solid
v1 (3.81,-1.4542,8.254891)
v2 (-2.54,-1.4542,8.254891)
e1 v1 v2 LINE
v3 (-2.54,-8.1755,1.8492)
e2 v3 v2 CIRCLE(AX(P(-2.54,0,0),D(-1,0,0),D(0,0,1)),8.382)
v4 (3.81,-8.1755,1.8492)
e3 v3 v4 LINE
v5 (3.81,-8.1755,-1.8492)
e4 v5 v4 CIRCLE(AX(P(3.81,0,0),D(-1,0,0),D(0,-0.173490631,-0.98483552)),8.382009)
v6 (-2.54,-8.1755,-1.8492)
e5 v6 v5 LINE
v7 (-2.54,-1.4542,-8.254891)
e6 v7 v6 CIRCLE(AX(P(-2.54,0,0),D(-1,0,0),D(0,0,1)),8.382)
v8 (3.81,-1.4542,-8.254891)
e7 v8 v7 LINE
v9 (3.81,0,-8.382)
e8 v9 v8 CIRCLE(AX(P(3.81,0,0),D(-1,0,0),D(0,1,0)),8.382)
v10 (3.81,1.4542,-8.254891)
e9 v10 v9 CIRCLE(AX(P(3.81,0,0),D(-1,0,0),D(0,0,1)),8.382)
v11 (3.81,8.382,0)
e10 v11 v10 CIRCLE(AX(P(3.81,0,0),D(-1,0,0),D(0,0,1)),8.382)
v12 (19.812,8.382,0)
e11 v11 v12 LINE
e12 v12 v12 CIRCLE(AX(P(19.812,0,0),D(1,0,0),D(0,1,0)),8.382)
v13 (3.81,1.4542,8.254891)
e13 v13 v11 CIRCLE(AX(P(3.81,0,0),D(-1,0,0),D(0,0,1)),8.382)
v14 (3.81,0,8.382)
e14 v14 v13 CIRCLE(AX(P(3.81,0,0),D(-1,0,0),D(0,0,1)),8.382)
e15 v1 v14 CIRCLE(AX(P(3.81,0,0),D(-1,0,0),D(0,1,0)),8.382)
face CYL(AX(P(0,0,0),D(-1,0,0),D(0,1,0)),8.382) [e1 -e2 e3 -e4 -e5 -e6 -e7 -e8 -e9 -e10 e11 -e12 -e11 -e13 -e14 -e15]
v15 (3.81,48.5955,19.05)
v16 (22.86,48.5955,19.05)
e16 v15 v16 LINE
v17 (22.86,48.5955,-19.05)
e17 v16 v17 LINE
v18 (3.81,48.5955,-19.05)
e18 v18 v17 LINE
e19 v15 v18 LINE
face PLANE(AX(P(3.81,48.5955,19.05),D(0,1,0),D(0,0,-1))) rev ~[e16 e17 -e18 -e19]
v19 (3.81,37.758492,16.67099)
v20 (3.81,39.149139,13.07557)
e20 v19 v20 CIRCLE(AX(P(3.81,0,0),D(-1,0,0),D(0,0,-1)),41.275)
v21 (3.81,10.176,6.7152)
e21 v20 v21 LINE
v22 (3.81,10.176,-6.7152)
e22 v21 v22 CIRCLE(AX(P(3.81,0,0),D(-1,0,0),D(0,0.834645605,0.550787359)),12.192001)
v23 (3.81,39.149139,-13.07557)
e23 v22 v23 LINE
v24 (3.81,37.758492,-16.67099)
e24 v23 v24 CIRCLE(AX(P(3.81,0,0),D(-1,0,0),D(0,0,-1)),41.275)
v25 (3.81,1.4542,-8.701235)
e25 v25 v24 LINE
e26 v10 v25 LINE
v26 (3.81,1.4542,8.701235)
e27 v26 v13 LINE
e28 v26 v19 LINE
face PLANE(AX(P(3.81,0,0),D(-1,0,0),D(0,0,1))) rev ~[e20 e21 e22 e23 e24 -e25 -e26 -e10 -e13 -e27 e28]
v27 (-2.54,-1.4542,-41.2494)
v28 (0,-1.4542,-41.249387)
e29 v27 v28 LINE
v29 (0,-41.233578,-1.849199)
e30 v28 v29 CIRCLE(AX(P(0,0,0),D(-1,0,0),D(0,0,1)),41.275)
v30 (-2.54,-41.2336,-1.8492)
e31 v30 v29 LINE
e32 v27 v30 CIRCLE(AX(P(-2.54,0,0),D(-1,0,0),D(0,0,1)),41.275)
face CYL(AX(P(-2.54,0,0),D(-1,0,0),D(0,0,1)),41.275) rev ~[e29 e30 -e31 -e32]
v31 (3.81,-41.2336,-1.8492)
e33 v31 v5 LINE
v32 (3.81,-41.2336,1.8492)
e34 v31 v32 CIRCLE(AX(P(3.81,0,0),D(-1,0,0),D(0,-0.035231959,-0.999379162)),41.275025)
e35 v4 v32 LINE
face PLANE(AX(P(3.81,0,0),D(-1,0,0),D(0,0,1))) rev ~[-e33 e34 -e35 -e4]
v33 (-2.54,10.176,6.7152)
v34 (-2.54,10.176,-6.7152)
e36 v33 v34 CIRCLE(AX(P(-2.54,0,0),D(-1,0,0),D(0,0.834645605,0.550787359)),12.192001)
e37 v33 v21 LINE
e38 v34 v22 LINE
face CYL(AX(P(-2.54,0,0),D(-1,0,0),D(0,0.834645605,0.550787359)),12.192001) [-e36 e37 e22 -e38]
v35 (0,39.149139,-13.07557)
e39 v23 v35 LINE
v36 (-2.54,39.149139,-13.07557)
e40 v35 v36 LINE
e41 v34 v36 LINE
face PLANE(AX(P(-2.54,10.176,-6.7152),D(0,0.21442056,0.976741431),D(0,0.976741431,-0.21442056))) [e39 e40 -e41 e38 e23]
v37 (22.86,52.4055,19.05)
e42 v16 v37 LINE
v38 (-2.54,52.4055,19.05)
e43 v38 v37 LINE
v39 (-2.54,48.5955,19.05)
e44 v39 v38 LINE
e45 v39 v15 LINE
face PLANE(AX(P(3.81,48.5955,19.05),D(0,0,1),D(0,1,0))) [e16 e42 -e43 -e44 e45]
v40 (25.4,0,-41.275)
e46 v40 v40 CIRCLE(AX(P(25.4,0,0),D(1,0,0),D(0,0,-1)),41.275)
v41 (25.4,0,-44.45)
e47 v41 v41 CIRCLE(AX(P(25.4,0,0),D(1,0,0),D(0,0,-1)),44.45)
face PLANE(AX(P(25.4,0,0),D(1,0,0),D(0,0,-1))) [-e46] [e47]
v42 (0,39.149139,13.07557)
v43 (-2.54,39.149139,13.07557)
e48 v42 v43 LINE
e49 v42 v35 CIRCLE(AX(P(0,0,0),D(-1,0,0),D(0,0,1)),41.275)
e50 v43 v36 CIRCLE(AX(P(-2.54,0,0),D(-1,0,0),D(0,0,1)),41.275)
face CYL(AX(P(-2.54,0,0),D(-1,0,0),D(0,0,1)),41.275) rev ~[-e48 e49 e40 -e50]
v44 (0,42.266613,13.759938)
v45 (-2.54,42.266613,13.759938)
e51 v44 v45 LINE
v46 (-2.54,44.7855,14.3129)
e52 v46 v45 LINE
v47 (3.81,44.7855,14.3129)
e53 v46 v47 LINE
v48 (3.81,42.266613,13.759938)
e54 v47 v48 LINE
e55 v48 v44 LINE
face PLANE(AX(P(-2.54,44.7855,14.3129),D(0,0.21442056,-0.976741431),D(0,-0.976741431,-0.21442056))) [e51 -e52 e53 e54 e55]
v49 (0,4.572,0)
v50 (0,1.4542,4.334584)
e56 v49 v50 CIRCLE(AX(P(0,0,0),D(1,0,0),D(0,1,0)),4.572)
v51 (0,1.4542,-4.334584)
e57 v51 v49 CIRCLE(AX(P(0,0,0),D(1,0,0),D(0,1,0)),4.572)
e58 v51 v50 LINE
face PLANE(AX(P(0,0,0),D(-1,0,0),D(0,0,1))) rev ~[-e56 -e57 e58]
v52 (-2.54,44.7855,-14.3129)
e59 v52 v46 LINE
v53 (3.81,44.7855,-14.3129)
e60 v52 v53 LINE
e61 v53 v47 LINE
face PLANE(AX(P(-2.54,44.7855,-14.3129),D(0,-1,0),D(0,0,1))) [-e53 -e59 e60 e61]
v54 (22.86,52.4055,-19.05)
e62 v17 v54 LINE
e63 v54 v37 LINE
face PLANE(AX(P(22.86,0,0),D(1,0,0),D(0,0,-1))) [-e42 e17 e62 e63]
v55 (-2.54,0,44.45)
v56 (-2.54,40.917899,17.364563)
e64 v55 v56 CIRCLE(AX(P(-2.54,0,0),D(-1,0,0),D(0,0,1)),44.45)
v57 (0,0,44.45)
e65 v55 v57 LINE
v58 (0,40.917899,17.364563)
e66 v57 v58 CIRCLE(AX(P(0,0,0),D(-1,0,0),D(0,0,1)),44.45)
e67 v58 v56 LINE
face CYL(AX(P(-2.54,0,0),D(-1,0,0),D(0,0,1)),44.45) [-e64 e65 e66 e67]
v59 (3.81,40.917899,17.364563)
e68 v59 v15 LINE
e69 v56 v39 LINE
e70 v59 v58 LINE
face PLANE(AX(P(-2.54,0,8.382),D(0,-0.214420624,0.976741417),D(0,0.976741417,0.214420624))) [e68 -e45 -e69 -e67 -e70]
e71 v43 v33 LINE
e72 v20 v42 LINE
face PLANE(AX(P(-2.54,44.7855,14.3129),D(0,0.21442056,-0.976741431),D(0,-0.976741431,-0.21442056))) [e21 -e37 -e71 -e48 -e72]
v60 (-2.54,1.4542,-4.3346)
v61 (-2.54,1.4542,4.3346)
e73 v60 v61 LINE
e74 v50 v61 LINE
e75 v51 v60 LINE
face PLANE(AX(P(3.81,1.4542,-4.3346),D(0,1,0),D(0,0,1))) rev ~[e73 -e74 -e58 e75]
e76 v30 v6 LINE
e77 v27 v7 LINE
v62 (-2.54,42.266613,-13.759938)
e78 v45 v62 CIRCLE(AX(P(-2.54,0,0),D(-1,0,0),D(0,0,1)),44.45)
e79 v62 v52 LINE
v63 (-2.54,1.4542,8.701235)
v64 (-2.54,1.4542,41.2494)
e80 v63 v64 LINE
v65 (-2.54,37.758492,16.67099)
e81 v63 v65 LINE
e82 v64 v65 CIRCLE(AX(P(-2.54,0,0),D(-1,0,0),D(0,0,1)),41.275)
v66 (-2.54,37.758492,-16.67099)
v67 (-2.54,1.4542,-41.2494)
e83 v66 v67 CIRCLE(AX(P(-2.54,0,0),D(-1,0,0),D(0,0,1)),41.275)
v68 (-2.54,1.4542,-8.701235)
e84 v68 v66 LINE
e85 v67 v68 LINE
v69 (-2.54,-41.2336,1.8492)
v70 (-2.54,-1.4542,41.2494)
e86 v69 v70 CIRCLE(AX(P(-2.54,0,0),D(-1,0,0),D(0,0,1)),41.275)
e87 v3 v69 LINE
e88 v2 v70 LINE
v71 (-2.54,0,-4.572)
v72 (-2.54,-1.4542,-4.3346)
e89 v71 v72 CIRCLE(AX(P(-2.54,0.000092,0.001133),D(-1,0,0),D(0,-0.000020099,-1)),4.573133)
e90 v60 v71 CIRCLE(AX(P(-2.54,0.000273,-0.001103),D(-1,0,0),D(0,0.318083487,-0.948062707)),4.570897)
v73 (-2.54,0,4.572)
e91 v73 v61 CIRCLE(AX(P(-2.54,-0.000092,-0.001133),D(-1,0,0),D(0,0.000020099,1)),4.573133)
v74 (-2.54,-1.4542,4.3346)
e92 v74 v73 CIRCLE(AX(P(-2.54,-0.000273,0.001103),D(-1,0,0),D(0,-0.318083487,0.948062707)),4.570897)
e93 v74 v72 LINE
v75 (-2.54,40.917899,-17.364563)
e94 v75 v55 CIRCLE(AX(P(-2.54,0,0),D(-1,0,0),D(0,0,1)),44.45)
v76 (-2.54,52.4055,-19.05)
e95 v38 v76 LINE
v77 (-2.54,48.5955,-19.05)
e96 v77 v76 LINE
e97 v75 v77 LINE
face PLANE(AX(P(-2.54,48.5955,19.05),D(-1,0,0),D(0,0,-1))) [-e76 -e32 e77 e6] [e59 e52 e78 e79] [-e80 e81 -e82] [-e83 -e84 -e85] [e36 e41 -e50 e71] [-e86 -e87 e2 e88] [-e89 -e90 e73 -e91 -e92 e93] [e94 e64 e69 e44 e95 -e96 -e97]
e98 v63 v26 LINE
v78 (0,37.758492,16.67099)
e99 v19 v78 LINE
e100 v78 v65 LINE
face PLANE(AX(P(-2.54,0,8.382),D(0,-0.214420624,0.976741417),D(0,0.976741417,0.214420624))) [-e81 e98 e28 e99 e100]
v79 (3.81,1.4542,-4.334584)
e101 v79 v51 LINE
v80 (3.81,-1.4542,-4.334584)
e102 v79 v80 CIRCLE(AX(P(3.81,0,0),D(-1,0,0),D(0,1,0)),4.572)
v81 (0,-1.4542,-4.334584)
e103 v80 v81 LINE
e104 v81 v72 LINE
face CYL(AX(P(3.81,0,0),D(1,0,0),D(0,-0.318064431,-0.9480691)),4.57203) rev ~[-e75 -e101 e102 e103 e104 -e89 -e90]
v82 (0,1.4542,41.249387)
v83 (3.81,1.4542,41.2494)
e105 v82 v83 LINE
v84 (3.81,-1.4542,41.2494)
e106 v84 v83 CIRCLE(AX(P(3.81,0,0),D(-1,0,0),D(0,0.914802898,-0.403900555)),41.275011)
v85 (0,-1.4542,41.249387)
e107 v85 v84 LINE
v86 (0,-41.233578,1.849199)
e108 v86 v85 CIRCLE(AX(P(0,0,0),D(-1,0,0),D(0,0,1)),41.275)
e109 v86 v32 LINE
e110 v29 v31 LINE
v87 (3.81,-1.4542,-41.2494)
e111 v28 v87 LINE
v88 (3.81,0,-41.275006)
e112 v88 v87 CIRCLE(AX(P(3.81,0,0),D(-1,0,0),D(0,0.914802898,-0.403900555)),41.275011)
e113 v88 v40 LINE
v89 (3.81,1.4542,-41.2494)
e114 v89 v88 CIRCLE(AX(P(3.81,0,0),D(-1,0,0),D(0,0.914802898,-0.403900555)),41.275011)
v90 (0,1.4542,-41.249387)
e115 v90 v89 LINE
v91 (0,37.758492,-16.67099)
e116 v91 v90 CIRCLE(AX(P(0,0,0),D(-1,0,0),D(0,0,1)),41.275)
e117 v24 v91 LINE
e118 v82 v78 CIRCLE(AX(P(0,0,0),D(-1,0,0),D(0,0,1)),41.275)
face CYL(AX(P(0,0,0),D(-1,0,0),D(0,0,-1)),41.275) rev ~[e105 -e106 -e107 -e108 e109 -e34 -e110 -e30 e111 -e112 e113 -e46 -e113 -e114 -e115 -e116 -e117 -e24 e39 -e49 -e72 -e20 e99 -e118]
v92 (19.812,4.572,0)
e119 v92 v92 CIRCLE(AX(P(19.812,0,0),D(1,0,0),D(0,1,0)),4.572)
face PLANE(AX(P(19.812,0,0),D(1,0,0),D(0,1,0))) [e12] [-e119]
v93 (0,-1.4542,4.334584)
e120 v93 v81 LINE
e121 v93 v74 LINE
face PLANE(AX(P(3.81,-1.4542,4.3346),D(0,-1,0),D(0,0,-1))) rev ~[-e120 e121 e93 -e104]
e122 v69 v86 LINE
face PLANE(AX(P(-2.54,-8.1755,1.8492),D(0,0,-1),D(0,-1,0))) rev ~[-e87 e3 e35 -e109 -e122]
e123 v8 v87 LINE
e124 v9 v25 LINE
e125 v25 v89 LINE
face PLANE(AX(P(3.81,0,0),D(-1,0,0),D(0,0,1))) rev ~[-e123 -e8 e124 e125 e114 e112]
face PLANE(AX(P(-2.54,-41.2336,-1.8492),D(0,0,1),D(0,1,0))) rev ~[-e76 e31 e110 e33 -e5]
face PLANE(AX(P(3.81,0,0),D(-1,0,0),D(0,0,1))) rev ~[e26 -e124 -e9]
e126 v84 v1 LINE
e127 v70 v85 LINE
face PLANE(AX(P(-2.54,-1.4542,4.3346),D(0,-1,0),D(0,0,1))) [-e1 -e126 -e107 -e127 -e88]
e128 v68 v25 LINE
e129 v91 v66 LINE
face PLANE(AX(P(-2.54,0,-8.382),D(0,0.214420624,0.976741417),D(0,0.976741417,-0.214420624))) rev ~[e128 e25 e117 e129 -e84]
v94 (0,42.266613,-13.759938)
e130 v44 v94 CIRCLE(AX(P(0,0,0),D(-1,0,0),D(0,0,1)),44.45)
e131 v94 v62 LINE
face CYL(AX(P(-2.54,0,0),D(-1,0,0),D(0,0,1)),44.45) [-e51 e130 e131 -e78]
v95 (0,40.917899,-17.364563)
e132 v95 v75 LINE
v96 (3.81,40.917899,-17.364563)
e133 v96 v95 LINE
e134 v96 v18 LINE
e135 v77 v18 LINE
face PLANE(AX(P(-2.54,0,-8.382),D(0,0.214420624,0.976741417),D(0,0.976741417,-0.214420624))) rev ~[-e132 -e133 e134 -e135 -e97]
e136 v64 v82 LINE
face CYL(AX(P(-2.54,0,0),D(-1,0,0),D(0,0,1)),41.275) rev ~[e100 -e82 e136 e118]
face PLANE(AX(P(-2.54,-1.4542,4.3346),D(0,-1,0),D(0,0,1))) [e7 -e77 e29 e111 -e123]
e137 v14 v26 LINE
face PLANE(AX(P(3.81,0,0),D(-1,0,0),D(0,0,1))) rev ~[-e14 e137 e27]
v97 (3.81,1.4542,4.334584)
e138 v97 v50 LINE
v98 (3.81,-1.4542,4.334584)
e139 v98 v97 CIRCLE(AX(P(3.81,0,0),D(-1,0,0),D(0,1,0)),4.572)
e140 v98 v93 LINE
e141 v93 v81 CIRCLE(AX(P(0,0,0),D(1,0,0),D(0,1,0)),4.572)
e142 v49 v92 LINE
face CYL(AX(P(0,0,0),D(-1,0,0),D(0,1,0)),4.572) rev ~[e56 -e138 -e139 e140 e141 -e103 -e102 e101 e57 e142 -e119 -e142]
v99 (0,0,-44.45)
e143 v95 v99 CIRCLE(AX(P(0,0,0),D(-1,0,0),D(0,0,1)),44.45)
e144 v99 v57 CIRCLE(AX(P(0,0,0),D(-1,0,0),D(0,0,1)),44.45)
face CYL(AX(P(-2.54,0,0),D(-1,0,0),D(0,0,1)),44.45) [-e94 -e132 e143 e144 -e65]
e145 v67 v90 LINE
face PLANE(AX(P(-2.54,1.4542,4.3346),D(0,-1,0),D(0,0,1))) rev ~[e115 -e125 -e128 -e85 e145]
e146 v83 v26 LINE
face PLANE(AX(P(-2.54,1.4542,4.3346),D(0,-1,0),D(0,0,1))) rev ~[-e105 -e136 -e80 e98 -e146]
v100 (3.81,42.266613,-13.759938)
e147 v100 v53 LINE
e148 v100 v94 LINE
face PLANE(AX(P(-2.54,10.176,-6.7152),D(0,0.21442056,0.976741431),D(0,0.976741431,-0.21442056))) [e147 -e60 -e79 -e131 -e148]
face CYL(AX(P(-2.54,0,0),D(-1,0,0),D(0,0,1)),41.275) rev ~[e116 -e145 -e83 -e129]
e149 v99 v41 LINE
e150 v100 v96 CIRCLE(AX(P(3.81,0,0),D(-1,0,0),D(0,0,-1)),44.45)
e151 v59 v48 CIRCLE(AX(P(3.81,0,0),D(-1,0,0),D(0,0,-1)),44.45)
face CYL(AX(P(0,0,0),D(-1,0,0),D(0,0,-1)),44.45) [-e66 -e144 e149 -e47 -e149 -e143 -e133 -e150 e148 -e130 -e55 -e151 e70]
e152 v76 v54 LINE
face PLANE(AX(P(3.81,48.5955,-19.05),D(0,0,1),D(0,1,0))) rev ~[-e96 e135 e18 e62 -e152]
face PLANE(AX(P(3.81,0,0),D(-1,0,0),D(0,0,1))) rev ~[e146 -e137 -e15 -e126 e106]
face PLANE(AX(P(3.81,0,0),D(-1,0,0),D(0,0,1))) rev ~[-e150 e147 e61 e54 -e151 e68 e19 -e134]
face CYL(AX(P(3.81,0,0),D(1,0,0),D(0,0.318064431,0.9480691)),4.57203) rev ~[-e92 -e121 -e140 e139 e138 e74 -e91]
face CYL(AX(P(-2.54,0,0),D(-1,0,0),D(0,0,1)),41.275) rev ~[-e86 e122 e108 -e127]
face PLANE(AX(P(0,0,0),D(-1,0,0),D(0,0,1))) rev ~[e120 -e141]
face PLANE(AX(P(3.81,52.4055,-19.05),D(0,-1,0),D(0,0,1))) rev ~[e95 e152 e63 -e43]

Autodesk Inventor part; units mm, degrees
ref_plane "YZ Plane" through (0, 0, 0) normal (1, 0, 0) x (0, 1, 0)
ref_plane "XZ Plane" through (0, 0, 0) normal (0, 1, 0) x (-1, 0, 0)
ref_plane "XY Plane" through (0, 0, 0) normal (0, 0, 1) x (1, 0, 0)
sketch "Sketch1" plane through (0, 0, 0) normal (1, 0, 0) x (0, 1, 0)
  circle A0 centre (0, 0) radius 4.572
  circle A1 centre (0, 0) radius 8.382
  dimension "d0" = 9.144
  dimension "d1" = 3.81
extrude "Extrusion1" add sketch "Sketch1" along normal blind 19.812
sketch "Sketch2" plane through (0, 0, 0) normal (-1, 0, 0) x (0, 0, 1)
  circle A0 centre (0, 0) radius 8.382
  circle A1 centre (0, 0) radius 7.747
  circle A2 centre (0, 0) radius 8.382 projected
  dimension "d42" = 0
extrude "Extrusion2" add sketch "Sketch2" along normal blind 2.54 contours A0 | A1
sketch "Sketch3" plane through (-2.54, 0, 0) normal (-1, 0, 0) x (0, 0, 1)
  line L0 (19.05, 48.5955) -> (-19.05, 48.5955)
  circle A0 centre (0, 0) radius 8.382 projected
  line L1 (8.382, 0) -> (19.05, 48.5955)
  line L2 (-8.382, 0) -> (-19.05, 48.5955)
  arc A1 (8.382, 0) -> (-8.382, 0) centre (0, 0) ccw
  line L3 (-14.3129, 44.7855) -> (14.3129, 44.7855)
  line L4 (14.3129, 44.7855) -> (6.7152, 10.176)
  arc A2 (6.7152, 10.176) -> (-6.7152, 10.176) centre (0, 0) ccw
  line L5 (-6.7152, 10.176) -> (-14.3129, 44.7855)
  dimension "d6" = 38.1
  dimension "d7" = 19.05
  dimension "d8" = 3.81
extrude "Extrusion3" add sketch "Sketch3" against normal blind 6.35 contours L1 A0 L2 L0
sketch "Sketch6" plane through (-2.54, 44.7855, -14.3129) normal (0, -1, 0) x (1, 0, 0)
  line L0 (6.35, 32.4159) -> (26.9875, 32.4159) projected
  line L1 (13.4874, 32.4159) -> (13.4874, 26.0989)
  line L2 (26.9875, 32.4159) -> (26.9875, -3.9117) projected
  point P0 (2.54, 14.3129)
  dimension "d20" = 13.5001
sketch "Sketch10" plane through (0, 0, 0) normal (1, 0, 0) x (0, 0, -1)
  circle A0 centre (0, 0) radius 1.4542
  line L0 (-4.572, 1.4542) -> (4.572, 1.4542)
  line L1 (4.572, 1.4542) -> (4.572, -1.4542)
  line L2 (4.572, -1.4542) -> (-4.572, -1.4542)
  line L3 (-4.572, -1.4542) -> (-4.572, 1.4542)
  circle A1 centre (0, 0) radius 4.572 projected
  dimension "d43" = 0
  dimension "d44" = 0
extrude "Extrusion7" cut sketch "Sketch10" against normal blind 22.225 contours A0 | A0 L0 A1 L2 | A0 L2 A1 L0 | A1 L3 L0 | L0 L1 A1 | A1 L1 L2 | L2 L3 A1
sketch "Sketch13" plane through (-2.54, 48.5955, 19.05) normal (0, 1, 0) x (1, 0, 0)
  line L0 (4.6355, 36.83) -> (1.7145, 36.83)
  line L1 (1.7145, 36.83) -> (1.7145, 33.909)
  line L2 (1.7145, 33.909) -> (4.6355, 33.909)
  line L3 (4.6355, 33.909) -> (4.6355, 36.83)
  line L4 (6.35, 38.1) -> (6.35, 0) projected
  line L5 (0, 38.1) -> (6.35, 38.1) projected
  line L6 (4.6228, 4.191) -> (1.7018, 4.191)
  line L7 (1.7018, 4.191) -> (1.7018, 1.27)
  line L8 (1.7018, 1.27) -> (4.6228, 1.27)
  line L9 (4.6228, 1.27) -> (4.6228, 4.191)
  line L10 (0, 0) -> (6.35, 0) projected
  line L11 (0, 0) -> (0, 38.1) projected
  line L12 (0, 0) -> (6.35, 0) projected
  line L13 (6.35, 38.1) -> (6.35, 0) projected
  line L14 (0, 38.1) -> (6.35, 38.1) projected
  point P0 (2.54, 19.05)
  dimension "d32" = 2.921
  dimension "d33" = 2.921
  dimension "d34" = 1.7145
  dimension "d35" = 1.27
  dimension "d36" = 2.921
  dimension "d37" = 2.921
  dimension "d38" = 1.7272
  dimension "d39" = 1.27
extrude "Extrusion9" add sketch "Sketch13" along normal blind 3.81 contours L3 L2 L1 L0 | L4 L10 L11 L5 | L9 L8 L7 L6
sketch "Sketch14" plane through (0, 0, 0) normal (-1, 0, 0) x (0, 0, 1)
  arc A0 (4.3346, -1.4542) -> (4.572, 0) centre (0, 0) ccw projected
  line L0 (4.3346, -1.4542) -> (4.572, -1.4542) projected
  line L1 (4.572, -1.4542) -> (4.572, 0) projected
  arc A1 (4.572, 0) -> (4.3346, 1.4542) centre (0, 0) ccw projected
  line L2 (4.572, 0) -> (4.572, 1.4542) projected
  line L3 (4.572, 1.4542) -> (4.3346, 1.4542) projected
  arc A2 (-4.572, 0) -> (-4.3346, -1.4542) centre (0, 0) ccw projected
  line L4 (-4.572, 0) -> (-4.572, -1.4542) projected
  line L5 (-4.572, -1.4542) -> (-4.3346, -1.4542) projected
  arc A3 (-4.3346, 1.4542) -> (-4.572, 0) centre (0, 0) ccw projected
  line L6 (-4.3346, 1.4542) -> (-4.572, 1.4542) projected
  line L7 (-4.572, 1.4542) -> (-4.572, 0) projected
extrude "Extrusion10" add sketch "Sketch14" along normal blind 2.54
sketch "Sketch15" plane through (-2.54, 0, 0) normal (-1, 0, 0) x (0, 0, 1)
  circle A0 centre (0, 0) radius 41.275
  circle A1 centre (0, 0) radius 44.45
  dimension "d47" = 82.55
  dimension "d48" = 88.9
extrude "Extrusion11" add sketch "Sketch15" against normal blind 2.54
sketch "Sketch16" plane through (0, 0, 0) normal (1, 0, 0) x (0, 0, -1)
  circle A0 centre (0, 0) radius 44.45
  circle A1 centre (0, 0) radius 41.275
  dimension "d51" = 82.55
extrude "Extrusion12" add sketch "Sketch16" along normal blind 25.4
sketch "Sketch19" plane through (-2.54, 0, 0) normal (-1, 0, 0) x (0, 0, 1)
  line L0 (4.3346, 1.4542) -> (-4.3346, 1.4542) projected
  arc A0 (-16.671, 37.7585) -> (16.671, 37.7585) centre (0, 0) ccw projected
  line L1 (-4.3346, 1.4542) -> (-41.2494, 1.4542)
  line L2 (4.3346, 1.4542) -> (41.2494, 1.4542)
  circle A1 centre (0, 0) radius 8.382
  line L3 (-4.3346, -1.4542) -> (4.3346, -1.4542)
  line L4 (4.3346, 1.4542) -> (-4.3346, 1.4542)
  line L5 (-41.2494, -1.4542) -> (41.2494, -1.4542)
extrude "Extrusion14" add sketch "Sketch19" against normal blind 6.35 contours L2 A1 L5 L3 L1 L0 | L2 A0 L5 A1 | A1 L5 A0 L1
sketch "Sketch20" plane through (3.81, 0, 0) normal (1, 0, 0) x (0, 0, -1)
  arc A0 (4.3346, -1.4542) -> (4.3346, 1.4542) centre (0, 0) ccw projected
  line L0 (4.3346, 1.4542) -> (-4.3346, 1.4542) projected
  arc A1 (-4.3346, 1.4542) -> (-4.3346, -1.4542) centre (0, 0) ccw projected
  line L1 (-4.3346, -1.4542) -> (4.3346, -1.4542) projected
extrude "Extrusion15" cut sketch "Sketch20" against normal blind 6.35
sketch "Sketch21" plane through (-2.54, 0, 0) normal (-1, 0, 0) x (0, 0, 1)
  arc A0 (-8.2549, -1.4542) -> (8.2549, -1.4542) centre (0, 0) ccw projected
  line L0 (1.8492, -8.1755) -> (1.8492, -41.2336)
  arc A1 (-41.2494, -1.4542) -> (41.2494, -1.4542) centre (0, 0) ccw projected
  line L1 (-1.8492, -41.2336) -> (-1.8492, -8.1755)
  arc A2 (-1.8492, -8.1755) -> (1.8492, -8.1755) centre (0, 0) ccw
  arc A3 (-1.8492, -41.2336) -> (1.8492, -41.2336) centre (0, 0) ccw
extrude "Extrusion16" add sketch "Sketch21" against normal blind 6.35
sketch "Sketch22" plane through (-2.54, 48.5955, 19.05) normal (0, 1, 0) x (1, 0, 0)
  point P0 (2.54, 19.05)
sketch "Sketch23" plane through (3.81, 0, 0) normal (1, 0, 0) x (0, 0, -1)
  line L0 (19.05, 52.4055) -> (-19.05, 52.4055) projected
  line L1 (-19.05, 48.5955) -> (-19.05, 52.4055) projected
  line L2 (19.05, 52.4055) -> (-19.05, 52.4055)
  line L3 (-19.05, 52.4055) -> (-19.05, 48.5955)
  line L4 (-19.05, 48.5955) -> (19.05, 48.5955)
  line L5 (19.05, 48.5955) -> (19.05, 52.4055)
  point P0 (0, 0)
extrude "Extrusion17" add sketch "Sketch23" along normal blind 19.05
properties part number "BasicThrustMotorHousing"
